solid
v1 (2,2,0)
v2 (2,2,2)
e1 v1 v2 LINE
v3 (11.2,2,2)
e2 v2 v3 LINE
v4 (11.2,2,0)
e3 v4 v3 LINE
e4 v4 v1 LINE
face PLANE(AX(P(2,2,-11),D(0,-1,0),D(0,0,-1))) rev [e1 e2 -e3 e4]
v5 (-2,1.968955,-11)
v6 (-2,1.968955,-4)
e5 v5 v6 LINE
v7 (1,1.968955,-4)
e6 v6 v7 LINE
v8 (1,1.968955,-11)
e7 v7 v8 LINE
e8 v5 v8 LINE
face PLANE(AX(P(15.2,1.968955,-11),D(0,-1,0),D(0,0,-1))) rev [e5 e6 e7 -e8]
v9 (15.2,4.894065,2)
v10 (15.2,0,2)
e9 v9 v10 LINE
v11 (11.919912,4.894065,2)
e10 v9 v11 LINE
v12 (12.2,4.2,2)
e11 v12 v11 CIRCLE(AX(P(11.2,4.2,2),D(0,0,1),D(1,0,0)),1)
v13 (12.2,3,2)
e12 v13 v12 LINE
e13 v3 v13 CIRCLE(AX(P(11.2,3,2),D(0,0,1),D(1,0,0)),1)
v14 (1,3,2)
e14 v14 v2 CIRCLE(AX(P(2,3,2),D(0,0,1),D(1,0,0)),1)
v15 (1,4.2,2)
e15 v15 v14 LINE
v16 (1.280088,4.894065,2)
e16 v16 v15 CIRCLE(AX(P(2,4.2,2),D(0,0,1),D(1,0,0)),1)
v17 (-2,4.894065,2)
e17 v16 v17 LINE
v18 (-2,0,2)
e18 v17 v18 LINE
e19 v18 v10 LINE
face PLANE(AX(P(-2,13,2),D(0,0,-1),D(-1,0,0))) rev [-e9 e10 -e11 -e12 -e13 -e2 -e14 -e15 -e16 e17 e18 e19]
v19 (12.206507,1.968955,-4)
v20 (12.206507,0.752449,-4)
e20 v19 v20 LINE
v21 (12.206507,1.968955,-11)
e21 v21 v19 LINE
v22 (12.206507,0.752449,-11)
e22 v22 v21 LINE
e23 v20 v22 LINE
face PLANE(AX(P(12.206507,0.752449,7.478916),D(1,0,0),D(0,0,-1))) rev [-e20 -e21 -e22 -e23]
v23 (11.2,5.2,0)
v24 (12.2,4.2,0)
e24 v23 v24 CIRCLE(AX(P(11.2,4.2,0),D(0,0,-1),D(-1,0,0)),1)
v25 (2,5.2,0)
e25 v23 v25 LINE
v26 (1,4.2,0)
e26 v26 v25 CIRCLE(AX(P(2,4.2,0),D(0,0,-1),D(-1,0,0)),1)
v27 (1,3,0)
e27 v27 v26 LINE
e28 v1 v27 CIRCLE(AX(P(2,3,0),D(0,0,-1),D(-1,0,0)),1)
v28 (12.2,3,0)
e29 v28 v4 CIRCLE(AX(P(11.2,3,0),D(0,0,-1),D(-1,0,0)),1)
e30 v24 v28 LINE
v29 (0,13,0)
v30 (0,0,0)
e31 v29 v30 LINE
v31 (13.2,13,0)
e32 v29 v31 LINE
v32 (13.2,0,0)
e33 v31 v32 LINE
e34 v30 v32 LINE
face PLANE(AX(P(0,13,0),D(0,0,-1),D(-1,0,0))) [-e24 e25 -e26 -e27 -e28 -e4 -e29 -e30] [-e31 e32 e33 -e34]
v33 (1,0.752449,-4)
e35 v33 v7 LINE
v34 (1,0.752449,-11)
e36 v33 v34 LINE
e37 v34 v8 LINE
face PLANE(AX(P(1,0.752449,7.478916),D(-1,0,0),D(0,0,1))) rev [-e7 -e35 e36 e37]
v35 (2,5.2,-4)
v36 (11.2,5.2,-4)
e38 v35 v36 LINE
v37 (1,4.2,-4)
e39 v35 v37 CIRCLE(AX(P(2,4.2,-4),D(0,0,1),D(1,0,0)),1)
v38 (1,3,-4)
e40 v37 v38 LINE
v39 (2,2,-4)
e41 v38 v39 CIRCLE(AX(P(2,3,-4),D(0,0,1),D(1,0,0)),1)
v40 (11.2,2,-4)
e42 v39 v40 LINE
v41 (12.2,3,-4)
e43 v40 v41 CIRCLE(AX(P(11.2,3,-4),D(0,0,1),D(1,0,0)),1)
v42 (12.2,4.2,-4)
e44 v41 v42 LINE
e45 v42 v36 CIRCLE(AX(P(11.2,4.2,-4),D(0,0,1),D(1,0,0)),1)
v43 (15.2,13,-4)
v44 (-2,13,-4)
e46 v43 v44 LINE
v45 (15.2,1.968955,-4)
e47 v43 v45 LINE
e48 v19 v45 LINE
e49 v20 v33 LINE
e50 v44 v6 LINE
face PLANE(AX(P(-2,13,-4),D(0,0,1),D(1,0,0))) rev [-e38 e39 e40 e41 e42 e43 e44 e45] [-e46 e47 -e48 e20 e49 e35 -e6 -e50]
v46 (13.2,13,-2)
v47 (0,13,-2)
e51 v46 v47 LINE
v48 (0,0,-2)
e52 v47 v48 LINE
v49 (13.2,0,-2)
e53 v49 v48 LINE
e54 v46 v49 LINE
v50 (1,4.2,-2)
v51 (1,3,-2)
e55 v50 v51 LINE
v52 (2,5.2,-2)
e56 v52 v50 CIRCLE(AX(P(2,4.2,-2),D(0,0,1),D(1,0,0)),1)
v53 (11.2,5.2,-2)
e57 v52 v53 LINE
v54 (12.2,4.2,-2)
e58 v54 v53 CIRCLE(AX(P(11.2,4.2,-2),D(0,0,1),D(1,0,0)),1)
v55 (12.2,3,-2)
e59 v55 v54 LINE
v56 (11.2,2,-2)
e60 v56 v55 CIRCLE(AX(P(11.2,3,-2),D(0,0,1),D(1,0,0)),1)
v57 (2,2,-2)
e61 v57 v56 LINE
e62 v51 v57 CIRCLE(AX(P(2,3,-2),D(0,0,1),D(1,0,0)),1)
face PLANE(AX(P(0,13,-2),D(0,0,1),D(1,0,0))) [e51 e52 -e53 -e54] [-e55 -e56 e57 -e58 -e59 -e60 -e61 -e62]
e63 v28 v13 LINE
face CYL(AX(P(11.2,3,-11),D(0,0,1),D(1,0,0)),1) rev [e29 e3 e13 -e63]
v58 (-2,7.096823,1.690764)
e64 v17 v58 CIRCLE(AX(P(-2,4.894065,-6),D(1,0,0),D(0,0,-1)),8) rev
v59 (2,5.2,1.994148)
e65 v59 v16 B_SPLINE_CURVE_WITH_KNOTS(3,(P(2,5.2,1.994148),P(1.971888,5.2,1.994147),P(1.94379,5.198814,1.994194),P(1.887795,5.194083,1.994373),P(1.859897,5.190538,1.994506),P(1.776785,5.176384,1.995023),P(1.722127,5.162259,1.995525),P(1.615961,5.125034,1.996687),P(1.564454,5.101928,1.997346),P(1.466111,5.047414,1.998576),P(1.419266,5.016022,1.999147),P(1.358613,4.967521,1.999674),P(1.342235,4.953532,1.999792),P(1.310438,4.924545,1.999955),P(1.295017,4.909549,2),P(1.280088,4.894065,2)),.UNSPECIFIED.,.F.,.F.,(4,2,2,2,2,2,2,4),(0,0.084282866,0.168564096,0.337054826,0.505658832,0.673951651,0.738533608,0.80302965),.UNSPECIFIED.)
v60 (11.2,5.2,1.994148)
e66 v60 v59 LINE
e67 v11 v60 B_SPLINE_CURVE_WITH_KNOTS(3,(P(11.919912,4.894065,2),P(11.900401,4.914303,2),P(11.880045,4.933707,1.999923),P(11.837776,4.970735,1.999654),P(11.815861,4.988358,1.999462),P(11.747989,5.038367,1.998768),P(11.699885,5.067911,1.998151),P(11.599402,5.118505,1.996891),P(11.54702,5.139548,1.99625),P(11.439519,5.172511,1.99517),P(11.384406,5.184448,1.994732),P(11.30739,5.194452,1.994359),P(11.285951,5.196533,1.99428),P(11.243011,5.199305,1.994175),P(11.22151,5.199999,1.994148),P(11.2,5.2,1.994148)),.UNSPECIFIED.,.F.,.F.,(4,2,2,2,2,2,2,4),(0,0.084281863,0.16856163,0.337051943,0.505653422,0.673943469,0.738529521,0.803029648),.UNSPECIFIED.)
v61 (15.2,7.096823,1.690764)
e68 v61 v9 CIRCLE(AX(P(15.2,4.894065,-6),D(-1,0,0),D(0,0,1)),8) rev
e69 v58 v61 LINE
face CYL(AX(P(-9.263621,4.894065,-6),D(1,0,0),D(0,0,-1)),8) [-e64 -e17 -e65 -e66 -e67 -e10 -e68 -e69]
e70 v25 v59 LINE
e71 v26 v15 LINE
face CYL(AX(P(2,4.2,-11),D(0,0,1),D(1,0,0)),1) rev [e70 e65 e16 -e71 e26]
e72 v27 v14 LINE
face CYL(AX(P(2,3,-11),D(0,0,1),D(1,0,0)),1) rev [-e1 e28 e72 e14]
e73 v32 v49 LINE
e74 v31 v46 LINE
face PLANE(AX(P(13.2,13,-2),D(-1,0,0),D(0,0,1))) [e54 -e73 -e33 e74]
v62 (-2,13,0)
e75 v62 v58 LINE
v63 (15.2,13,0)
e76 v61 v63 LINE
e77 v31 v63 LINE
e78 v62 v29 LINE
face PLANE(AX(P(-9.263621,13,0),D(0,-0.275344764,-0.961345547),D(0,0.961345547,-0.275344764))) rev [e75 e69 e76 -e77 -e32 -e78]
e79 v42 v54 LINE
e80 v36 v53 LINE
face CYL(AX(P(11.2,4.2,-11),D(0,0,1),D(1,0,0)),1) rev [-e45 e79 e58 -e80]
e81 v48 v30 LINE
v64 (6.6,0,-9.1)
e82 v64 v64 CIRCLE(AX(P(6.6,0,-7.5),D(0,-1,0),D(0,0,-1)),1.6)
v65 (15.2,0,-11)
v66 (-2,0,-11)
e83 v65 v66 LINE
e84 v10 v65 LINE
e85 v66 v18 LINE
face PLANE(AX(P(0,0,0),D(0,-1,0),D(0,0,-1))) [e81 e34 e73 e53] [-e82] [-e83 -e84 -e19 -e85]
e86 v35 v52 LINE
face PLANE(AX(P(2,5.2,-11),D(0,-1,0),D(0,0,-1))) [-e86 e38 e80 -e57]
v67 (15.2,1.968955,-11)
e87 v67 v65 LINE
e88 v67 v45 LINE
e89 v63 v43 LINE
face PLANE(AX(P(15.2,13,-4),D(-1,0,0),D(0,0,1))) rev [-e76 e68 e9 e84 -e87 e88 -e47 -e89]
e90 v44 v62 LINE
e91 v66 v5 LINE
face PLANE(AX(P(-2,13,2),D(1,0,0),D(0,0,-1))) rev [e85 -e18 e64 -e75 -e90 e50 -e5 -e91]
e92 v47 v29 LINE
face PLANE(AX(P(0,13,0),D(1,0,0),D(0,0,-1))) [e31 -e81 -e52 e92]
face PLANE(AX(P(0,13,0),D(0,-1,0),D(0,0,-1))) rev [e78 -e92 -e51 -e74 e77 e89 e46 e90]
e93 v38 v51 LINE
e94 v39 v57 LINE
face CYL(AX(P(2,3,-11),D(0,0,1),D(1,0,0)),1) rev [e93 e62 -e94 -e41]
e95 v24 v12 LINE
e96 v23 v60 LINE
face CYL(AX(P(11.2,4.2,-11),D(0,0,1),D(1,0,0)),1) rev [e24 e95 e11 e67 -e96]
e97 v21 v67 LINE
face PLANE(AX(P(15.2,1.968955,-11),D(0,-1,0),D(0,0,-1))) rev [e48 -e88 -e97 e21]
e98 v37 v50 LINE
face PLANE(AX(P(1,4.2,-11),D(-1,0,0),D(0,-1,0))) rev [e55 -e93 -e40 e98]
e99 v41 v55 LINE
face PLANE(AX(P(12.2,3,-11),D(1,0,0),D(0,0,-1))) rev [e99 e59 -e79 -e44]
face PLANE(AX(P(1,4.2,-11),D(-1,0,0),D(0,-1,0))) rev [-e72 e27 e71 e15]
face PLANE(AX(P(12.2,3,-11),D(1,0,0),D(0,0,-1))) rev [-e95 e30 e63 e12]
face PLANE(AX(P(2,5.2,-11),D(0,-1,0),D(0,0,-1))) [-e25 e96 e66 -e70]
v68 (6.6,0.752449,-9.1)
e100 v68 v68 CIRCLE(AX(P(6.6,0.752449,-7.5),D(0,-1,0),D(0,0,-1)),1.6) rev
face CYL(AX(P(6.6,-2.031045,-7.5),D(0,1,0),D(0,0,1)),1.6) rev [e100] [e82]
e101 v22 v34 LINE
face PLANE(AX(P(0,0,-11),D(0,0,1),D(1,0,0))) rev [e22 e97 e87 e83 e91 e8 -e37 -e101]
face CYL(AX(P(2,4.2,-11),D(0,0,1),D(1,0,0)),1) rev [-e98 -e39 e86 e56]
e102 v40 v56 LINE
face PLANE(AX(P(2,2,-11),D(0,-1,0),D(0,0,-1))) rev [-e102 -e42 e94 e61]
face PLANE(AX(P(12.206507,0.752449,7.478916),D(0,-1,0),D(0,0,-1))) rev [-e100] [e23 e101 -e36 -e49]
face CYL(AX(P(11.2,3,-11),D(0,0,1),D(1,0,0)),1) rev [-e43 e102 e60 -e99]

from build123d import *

# Parameters (mm, degrees)
SKETCH1_W           = 17.2
SKETCH1_H           = 6
SKETCH1_W_2         = 13.2
SKETCH1_H_2         = 2
BOSS_EXTRUDE1_DEPTH = 13
CUT_EXTRUDE1_DEPTH  = 13
SKETCH4_W           = 17.2
SKETCH4_H           = 1.968955047
BOSS_EXTRUDE2_DEPTH = 7
SKETCH5_R           = 1.6
CUT_EXTRUDE2_DEPTH  = 4
CUT_EXTRUDE3_START  = -7
SKETCH6_W           = 11.206506984
SKETCH6_H           = 2.48590404
CUT_EXTRUDE3_DEPTH  = 7
CUT_EXTRUDE4_START  = -17.2
CUT_EXTRUDE4_DEPTH  = 17.2
FILLET1_R           = 8


with BuildPart() as part:
    # Sketch1 → Boss-Extrude1 (new body)
    with BuildSketch(Plane(origin=(0, 0, 0), x_dir=(1, 0, 0), z_dir=(0, 1, 0))):
        with Locations((6.6, 1)):
            Rectangle(SKETCH1_W, SKETCH1_H)
        with Locations((6.6, 1)):
            Rectangle(SKETCH1_W_2, SKETCH1_H_2, mode=Mode.SUBTRACT)
    extrude(amount=BOSS_EXTRUDE1_DEPTH)

    # Sketch2 → Cut-Extrude1 (cut)
    with BuildSketch(Plane.XY.offset(2)):
        with BuildLine():
            Line((2, 5.2), (11.2, 5.2))
            ThreePointArc((11.2, 5.2), (11.907106781, 4.907106781), (12.2, 4.2))
            Line((12.2, 4.2), (12.2, 3))
            ThreePointArc((12.2, 3), (11.907106781, 2.292893219), (11.2, 2))
            Line((11.2, 2), (2, 2))
            ThreePointArc((2, 2), (1.292893219, 2.292893219), (1, 3))
            Line((1, 3), (1, 4.2))
            ThreePointArc((1, 4.2), (1.292893219, 4.907106781), (2, 5.2))
        make_face()
    extrude(amount=-CUT_EXTRUDE1_DEPTH, mode=Mode.SUBTRACT)

    # Sketch4 → Boss-Extrude2 (add)
    with BuildSketch(Plane(origin=(0, 0, -4), x_dir=(-1, 0, 0), z_dir=(0, 0, -1))):
        with Locations((-6.6, 0.984477524)):
            Rectangle(SKETCH4_W, SKETCH4_H)
    extrude(amount=BOSS_EXTRUDE2_DEPTH)

    # Sketch5 → Cut-Extrude2 (cut)
    with BuildSketch(Plane(origin=(0, 1.968955047, 0), x_dir=(1, 0, 0), z_dir=(0, 1, 0))):
        with Locations(Location((6.6, 7.5, 0), (0, 0, 270))):
            Circle(SKETCH5_R)
    extrude(amount=-CUT_EXTRUDE2_DEPTH, mode=Mode.SUBTRACT)

    # Sketch6 → Cut-Extrude3 (cut)
    with BuildSketch(Plane(origin=(0, 0, -11), x_dir=(-1, 0, 0), z_dir=(0, 0, -1)).offset(CUT_EXTRUDE3_START)):
        with Locations((-6.603253492, 1.995400835)):
            Rectangle(SKETCH6_W, SKETCH6_H)
    extrude(amount=CUT_EXTRUDE3_DEPTH, mode=Mode.SUBTRACT)

    # Sketch7 → Cut-Extrude4 (cut)
    with BuildSketch(Plane(origin=(15.2, 0, 0), x_dir=(0, 0, -1), z_dir=(1, 0, 0)).offset(CUT_EXTRUDE4_START)):
        Polygon((0, 13), (-2, 6.017150325), (-2, 13), align=None)
    extrude(amount=CUT_EXTRUDE4_DEPTH, mode=Mode.SUBTRACT)

    # Fillet1
    # the kernel refuses this fillet: 8 mm, written as the material it takes off along each edge
    with BuildSketch(Plane(origin=(-4.807712941, 6.017150325, 2), x_dir=(0, -1, 0), z_dir=(1, 0, 0))) as fillet1_piece_1:
        with BuildLine():
            CenterArc((FILLET1_R * 0.140385647075, FILLET1_R), FILLET1_R, 254.01743912, 15.98256088)
            Line((-FILLET1_R * 0.134959116702, FILLET1_R * 0.0386544528314), (0, 0))
            Line((0, 0), (FILLET1_R * 0.140385647075, 0))
        make_face()
    extrude(amount=22.815425883, mode=Mode.SUBTRACT)


solid = part.part
